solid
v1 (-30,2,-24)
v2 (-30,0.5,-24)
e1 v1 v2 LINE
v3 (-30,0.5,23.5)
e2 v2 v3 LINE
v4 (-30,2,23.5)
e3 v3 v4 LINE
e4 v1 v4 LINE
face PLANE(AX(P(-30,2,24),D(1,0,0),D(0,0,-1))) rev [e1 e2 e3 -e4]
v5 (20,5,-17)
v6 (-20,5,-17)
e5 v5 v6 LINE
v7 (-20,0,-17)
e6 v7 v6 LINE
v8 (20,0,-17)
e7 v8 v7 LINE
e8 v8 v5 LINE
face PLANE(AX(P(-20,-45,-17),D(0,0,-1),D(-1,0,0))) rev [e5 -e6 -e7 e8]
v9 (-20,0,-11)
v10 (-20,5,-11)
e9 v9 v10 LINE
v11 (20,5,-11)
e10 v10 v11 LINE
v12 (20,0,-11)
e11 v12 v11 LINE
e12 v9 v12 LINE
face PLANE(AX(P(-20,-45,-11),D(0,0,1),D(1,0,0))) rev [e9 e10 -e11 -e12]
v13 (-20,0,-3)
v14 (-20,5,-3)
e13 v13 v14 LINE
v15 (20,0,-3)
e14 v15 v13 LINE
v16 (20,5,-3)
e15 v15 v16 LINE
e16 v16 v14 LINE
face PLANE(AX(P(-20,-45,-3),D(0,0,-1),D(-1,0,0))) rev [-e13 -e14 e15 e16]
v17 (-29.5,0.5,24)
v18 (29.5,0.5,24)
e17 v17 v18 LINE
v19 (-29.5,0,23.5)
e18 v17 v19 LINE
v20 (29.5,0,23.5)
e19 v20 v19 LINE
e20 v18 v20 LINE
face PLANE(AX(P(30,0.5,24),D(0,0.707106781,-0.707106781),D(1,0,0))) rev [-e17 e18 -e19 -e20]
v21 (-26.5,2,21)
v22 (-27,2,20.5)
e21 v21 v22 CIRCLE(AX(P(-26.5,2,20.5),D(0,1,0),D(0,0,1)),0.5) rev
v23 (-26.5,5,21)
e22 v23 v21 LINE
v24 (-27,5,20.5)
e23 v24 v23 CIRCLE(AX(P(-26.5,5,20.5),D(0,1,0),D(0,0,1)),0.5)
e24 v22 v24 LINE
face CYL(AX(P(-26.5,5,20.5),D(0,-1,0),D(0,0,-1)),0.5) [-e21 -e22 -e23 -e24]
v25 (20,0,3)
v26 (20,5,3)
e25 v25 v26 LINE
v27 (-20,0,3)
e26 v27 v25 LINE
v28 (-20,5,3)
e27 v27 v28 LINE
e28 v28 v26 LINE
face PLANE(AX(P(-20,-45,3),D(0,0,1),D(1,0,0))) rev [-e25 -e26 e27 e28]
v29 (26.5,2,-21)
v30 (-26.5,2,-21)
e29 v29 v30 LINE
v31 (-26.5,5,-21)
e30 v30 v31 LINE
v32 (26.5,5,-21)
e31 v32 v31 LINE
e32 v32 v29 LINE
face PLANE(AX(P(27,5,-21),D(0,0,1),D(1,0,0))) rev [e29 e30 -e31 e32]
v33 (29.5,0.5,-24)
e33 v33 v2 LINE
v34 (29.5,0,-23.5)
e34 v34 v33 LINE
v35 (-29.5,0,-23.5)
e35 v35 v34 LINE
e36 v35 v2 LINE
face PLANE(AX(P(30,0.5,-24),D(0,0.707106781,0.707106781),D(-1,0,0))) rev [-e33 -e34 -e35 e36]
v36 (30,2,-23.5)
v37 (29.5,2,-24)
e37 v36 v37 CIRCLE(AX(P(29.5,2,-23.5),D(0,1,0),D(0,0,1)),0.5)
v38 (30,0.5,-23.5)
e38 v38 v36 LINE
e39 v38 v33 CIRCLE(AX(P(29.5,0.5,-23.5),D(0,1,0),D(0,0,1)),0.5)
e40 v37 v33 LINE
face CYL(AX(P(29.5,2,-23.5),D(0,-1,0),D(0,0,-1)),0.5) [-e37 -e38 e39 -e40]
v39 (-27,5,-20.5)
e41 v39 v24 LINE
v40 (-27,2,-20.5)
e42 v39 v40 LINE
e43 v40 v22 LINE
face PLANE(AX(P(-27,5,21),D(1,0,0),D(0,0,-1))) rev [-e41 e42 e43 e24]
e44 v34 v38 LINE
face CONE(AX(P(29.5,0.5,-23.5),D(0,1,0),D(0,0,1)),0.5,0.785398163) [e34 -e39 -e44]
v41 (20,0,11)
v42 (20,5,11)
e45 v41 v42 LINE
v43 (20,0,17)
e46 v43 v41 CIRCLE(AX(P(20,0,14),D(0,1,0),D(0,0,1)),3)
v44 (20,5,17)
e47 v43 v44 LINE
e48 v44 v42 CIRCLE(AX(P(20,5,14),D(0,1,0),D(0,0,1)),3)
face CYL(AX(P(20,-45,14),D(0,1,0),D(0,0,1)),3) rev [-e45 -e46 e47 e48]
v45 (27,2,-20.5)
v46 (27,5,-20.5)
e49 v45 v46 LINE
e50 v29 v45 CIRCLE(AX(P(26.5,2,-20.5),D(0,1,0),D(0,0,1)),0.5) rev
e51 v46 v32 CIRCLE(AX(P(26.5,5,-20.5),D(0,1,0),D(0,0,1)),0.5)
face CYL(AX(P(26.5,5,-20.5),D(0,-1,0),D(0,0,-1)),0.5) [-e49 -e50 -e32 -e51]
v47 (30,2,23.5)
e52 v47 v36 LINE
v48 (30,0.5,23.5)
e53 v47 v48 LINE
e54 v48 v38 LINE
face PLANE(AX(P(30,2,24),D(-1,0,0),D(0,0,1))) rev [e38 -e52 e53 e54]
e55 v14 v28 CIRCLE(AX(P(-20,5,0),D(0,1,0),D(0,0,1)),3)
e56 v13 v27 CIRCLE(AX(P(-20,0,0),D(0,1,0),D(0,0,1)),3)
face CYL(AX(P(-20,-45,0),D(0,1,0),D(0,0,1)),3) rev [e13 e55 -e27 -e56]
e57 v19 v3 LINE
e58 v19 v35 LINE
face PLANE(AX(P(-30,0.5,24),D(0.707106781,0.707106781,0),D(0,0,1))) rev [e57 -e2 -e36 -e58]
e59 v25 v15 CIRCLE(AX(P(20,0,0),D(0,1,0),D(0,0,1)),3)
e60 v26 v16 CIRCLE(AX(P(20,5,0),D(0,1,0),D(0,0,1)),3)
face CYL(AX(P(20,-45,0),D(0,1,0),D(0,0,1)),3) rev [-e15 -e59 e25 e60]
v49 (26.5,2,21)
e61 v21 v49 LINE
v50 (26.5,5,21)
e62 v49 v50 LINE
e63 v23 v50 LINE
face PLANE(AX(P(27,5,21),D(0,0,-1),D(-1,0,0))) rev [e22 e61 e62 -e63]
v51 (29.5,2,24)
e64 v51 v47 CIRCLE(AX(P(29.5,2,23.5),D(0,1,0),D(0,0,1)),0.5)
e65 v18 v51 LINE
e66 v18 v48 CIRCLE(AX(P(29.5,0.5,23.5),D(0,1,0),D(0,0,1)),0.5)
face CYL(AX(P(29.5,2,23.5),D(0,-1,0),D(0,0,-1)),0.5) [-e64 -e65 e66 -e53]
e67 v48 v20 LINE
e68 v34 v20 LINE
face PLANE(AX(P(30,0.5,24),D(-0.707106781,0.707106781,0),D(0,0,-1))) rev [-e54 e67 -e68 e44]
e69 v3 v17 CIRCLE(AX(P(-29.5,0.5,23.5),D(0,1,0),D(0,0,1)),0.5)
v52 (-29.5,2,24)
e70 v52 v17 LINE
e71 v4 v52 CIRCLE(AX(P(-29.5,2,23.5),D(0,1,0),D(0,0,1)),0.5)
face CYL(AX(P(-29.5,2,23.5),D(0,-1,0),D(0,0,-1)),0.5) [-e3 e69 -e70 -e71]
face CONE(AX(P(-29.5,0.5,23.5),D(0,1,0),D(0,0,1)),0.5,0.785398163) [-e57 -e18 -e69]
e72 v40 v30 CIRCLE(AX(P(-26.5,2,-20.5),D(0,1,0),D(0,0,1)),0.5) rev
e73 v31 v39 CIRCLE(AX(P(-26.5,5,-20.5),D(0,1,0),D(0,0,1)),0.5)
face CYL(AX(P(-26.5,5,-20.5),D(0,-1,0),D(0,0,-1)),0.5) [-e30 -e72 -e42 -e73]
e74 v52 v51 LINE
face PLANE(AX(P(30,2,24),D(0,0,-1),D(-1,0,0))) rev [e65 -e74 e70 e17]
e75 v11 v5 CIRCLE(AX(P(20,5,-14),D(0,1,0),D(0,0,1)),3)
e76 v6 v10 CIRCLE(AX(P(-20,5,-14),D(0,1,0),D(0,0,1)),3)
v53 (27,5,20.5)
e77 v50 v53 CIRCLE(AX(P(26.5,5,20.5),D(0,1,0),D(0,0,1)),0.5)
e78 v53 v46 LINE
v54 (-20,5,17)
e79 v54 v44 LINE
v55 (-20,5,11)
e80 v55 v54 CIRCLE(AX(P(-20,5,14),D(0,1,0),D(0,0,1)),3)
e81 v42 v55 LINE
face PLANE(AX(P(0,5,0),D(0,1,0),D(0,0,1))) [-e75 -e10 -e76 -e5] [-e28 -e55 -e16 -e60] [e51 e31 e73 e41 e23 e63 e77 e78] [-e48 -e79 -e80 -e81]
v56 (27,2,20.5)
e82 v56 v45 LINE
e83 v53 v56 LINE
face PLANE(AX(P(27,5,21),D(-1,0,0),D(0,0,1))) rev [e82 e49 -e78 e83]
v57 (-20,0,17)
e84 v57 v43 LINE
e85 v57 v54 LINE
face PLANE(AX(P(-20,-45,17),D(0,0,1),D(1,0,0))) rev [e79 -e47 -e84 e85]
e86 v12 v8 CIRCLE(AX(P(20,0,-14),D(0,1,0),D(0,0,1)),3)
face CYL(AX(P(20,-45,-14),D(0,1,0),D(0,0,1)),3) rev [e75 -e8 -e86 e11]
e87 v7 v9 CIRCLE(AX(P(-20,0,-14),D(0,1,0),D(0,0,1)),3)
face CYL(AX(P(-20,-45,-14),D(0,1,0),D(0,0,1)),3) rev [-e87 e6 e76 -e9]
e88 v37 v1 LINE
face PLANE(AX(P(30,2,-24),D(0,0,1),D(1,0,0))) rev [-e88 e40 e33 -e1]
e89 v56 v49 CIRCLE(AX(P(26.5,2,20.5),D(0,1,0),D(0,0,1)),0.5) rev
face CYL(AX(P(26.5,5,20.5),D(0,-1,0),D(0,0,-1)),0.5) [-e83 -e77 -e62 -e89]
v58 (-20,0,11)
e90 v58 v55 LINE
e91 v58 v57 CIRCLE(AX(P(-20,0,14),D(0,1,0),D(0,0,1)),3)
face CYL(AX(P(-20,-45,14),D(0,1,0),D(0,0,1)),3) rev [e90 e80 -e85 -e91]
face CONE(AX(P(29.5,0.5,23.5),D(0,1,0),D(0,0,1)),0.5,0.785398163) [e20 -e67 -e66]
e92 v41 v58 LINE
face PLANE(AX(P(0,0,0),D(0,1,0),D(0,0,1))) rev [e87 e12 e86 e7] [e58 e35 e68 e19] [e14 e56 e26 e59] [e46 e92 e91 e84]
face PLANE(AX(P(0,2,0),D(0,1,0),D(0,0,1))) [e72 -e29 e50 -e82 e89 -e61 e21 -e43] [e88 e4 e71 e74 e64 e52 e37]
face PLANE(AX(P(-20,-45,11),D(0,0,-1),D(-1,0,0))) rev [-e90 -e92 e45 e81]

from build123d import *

# Parameters (mm, degrees)
SKETCH1_W           = 60
SKETCH1_H           = 48
BOSS_EXTRUDE1_DEPTH = 2
SKETCH2_W           = 54
SKETCH2_H           = 42
BOSS_EXTRUDE2_DEPTH = 3
CUT_EXTRUDE1_DEPTH  = 50
FILLET1_R           = 0.5
CHAMFER1_SIZE       = 0.5


with BuildPart() as part:
    # Sketch1 → Boss-Extrude1 (new body)
    with BuildSketch(Plane(origin=(0, 0, 0), x_dir=(1, 0, 0), z_dir=(0, 1, 0))):
        Rectangle(SKETCH1_W, SKETCH1_H)
    extrude(amount=BOSS_EXTRUDE1_DEPTH)

    # Sketch2 → Boss-Extrude2 (add)
    with BuildSketch(Plane(origin=(0, 2, 0), x_dir=(1, 0, 0), z_dir=(0, 1, 0))):
        Rectangle(SKETCH2_W, SKETCH2_H)
    extrude(amount=BOSS_EXTRUDE2_DEPTH)

    # Sketch4 → Cut-Extrude1 (cut)
    with BuildSketch(Plane(origin=(0, 5, 0), x_dir=(1, 0, 0), z_dir=(0, 1, 0))):
        with BuildLine():
            Line((-20, -3), (20, -3))
            ThreePointArc((20, -3), (23, 0), (20, 3))
            Line((20, 3), (-20, 3))
            ThreePointArc((-20, 3), (-23, 0), (-20, -3))
        make_face()
        with BuildLine():
            Line((-20, 11), (20, 11))
            ThreePointArc((20, 11), (23, 14), (20, 17))
            Line((20, 17), (-20, 17))
            ThreePointArc((-20, 17), (-23, 14), (-20, 11))
        make_face()
        with BuildLine():
            Line((-20, -17), (20, -17))
            ThreePointArc((20, -17), (23, -14), (20, -11))
            Line((20, -11), (-20, -11))
            ThreePointArc((-20, -11), (-23, -14), (-20, -17))
        make_face()
    extrude(amount=-CUT_EXTRUDE1_DEPTH, mode=Mode.SUBTRACT)

    # Fillet1
    fillet1_edges = [part.edges().sort_by_distance(p)[0] for p in [
        (-27, 3.5, -21),
        (-27, 3.5, 21),
        (27, 3.5, 21),
        (27, 3.5, -21),
        (30, 1, -24),
        (30, 1, 24),
        (-30, 1, 24),
    ]]
    fillet(fillet1_edges, radius=FILLET1_R)

    # Chamfer1
    chamfer1_edges = [part.edges().sort_by_distance(p)[0] for p in [
        (-30, 0, -0.25),
        (0, 0, 24),
        (-0.25, 0, -24),
        (30, 0, 0),
        (29.853553391, 0, -23.853553391),
        (29.853553391, 0, 23.853553391),
        (-29.853553391, 0, 23.853553391),
    ]]
    chamfer(chamfer1_edges, length=CHAMFER1_SIZE - 0.0001)  # a hair under: the kernel refuses the full size


solid = part.part
